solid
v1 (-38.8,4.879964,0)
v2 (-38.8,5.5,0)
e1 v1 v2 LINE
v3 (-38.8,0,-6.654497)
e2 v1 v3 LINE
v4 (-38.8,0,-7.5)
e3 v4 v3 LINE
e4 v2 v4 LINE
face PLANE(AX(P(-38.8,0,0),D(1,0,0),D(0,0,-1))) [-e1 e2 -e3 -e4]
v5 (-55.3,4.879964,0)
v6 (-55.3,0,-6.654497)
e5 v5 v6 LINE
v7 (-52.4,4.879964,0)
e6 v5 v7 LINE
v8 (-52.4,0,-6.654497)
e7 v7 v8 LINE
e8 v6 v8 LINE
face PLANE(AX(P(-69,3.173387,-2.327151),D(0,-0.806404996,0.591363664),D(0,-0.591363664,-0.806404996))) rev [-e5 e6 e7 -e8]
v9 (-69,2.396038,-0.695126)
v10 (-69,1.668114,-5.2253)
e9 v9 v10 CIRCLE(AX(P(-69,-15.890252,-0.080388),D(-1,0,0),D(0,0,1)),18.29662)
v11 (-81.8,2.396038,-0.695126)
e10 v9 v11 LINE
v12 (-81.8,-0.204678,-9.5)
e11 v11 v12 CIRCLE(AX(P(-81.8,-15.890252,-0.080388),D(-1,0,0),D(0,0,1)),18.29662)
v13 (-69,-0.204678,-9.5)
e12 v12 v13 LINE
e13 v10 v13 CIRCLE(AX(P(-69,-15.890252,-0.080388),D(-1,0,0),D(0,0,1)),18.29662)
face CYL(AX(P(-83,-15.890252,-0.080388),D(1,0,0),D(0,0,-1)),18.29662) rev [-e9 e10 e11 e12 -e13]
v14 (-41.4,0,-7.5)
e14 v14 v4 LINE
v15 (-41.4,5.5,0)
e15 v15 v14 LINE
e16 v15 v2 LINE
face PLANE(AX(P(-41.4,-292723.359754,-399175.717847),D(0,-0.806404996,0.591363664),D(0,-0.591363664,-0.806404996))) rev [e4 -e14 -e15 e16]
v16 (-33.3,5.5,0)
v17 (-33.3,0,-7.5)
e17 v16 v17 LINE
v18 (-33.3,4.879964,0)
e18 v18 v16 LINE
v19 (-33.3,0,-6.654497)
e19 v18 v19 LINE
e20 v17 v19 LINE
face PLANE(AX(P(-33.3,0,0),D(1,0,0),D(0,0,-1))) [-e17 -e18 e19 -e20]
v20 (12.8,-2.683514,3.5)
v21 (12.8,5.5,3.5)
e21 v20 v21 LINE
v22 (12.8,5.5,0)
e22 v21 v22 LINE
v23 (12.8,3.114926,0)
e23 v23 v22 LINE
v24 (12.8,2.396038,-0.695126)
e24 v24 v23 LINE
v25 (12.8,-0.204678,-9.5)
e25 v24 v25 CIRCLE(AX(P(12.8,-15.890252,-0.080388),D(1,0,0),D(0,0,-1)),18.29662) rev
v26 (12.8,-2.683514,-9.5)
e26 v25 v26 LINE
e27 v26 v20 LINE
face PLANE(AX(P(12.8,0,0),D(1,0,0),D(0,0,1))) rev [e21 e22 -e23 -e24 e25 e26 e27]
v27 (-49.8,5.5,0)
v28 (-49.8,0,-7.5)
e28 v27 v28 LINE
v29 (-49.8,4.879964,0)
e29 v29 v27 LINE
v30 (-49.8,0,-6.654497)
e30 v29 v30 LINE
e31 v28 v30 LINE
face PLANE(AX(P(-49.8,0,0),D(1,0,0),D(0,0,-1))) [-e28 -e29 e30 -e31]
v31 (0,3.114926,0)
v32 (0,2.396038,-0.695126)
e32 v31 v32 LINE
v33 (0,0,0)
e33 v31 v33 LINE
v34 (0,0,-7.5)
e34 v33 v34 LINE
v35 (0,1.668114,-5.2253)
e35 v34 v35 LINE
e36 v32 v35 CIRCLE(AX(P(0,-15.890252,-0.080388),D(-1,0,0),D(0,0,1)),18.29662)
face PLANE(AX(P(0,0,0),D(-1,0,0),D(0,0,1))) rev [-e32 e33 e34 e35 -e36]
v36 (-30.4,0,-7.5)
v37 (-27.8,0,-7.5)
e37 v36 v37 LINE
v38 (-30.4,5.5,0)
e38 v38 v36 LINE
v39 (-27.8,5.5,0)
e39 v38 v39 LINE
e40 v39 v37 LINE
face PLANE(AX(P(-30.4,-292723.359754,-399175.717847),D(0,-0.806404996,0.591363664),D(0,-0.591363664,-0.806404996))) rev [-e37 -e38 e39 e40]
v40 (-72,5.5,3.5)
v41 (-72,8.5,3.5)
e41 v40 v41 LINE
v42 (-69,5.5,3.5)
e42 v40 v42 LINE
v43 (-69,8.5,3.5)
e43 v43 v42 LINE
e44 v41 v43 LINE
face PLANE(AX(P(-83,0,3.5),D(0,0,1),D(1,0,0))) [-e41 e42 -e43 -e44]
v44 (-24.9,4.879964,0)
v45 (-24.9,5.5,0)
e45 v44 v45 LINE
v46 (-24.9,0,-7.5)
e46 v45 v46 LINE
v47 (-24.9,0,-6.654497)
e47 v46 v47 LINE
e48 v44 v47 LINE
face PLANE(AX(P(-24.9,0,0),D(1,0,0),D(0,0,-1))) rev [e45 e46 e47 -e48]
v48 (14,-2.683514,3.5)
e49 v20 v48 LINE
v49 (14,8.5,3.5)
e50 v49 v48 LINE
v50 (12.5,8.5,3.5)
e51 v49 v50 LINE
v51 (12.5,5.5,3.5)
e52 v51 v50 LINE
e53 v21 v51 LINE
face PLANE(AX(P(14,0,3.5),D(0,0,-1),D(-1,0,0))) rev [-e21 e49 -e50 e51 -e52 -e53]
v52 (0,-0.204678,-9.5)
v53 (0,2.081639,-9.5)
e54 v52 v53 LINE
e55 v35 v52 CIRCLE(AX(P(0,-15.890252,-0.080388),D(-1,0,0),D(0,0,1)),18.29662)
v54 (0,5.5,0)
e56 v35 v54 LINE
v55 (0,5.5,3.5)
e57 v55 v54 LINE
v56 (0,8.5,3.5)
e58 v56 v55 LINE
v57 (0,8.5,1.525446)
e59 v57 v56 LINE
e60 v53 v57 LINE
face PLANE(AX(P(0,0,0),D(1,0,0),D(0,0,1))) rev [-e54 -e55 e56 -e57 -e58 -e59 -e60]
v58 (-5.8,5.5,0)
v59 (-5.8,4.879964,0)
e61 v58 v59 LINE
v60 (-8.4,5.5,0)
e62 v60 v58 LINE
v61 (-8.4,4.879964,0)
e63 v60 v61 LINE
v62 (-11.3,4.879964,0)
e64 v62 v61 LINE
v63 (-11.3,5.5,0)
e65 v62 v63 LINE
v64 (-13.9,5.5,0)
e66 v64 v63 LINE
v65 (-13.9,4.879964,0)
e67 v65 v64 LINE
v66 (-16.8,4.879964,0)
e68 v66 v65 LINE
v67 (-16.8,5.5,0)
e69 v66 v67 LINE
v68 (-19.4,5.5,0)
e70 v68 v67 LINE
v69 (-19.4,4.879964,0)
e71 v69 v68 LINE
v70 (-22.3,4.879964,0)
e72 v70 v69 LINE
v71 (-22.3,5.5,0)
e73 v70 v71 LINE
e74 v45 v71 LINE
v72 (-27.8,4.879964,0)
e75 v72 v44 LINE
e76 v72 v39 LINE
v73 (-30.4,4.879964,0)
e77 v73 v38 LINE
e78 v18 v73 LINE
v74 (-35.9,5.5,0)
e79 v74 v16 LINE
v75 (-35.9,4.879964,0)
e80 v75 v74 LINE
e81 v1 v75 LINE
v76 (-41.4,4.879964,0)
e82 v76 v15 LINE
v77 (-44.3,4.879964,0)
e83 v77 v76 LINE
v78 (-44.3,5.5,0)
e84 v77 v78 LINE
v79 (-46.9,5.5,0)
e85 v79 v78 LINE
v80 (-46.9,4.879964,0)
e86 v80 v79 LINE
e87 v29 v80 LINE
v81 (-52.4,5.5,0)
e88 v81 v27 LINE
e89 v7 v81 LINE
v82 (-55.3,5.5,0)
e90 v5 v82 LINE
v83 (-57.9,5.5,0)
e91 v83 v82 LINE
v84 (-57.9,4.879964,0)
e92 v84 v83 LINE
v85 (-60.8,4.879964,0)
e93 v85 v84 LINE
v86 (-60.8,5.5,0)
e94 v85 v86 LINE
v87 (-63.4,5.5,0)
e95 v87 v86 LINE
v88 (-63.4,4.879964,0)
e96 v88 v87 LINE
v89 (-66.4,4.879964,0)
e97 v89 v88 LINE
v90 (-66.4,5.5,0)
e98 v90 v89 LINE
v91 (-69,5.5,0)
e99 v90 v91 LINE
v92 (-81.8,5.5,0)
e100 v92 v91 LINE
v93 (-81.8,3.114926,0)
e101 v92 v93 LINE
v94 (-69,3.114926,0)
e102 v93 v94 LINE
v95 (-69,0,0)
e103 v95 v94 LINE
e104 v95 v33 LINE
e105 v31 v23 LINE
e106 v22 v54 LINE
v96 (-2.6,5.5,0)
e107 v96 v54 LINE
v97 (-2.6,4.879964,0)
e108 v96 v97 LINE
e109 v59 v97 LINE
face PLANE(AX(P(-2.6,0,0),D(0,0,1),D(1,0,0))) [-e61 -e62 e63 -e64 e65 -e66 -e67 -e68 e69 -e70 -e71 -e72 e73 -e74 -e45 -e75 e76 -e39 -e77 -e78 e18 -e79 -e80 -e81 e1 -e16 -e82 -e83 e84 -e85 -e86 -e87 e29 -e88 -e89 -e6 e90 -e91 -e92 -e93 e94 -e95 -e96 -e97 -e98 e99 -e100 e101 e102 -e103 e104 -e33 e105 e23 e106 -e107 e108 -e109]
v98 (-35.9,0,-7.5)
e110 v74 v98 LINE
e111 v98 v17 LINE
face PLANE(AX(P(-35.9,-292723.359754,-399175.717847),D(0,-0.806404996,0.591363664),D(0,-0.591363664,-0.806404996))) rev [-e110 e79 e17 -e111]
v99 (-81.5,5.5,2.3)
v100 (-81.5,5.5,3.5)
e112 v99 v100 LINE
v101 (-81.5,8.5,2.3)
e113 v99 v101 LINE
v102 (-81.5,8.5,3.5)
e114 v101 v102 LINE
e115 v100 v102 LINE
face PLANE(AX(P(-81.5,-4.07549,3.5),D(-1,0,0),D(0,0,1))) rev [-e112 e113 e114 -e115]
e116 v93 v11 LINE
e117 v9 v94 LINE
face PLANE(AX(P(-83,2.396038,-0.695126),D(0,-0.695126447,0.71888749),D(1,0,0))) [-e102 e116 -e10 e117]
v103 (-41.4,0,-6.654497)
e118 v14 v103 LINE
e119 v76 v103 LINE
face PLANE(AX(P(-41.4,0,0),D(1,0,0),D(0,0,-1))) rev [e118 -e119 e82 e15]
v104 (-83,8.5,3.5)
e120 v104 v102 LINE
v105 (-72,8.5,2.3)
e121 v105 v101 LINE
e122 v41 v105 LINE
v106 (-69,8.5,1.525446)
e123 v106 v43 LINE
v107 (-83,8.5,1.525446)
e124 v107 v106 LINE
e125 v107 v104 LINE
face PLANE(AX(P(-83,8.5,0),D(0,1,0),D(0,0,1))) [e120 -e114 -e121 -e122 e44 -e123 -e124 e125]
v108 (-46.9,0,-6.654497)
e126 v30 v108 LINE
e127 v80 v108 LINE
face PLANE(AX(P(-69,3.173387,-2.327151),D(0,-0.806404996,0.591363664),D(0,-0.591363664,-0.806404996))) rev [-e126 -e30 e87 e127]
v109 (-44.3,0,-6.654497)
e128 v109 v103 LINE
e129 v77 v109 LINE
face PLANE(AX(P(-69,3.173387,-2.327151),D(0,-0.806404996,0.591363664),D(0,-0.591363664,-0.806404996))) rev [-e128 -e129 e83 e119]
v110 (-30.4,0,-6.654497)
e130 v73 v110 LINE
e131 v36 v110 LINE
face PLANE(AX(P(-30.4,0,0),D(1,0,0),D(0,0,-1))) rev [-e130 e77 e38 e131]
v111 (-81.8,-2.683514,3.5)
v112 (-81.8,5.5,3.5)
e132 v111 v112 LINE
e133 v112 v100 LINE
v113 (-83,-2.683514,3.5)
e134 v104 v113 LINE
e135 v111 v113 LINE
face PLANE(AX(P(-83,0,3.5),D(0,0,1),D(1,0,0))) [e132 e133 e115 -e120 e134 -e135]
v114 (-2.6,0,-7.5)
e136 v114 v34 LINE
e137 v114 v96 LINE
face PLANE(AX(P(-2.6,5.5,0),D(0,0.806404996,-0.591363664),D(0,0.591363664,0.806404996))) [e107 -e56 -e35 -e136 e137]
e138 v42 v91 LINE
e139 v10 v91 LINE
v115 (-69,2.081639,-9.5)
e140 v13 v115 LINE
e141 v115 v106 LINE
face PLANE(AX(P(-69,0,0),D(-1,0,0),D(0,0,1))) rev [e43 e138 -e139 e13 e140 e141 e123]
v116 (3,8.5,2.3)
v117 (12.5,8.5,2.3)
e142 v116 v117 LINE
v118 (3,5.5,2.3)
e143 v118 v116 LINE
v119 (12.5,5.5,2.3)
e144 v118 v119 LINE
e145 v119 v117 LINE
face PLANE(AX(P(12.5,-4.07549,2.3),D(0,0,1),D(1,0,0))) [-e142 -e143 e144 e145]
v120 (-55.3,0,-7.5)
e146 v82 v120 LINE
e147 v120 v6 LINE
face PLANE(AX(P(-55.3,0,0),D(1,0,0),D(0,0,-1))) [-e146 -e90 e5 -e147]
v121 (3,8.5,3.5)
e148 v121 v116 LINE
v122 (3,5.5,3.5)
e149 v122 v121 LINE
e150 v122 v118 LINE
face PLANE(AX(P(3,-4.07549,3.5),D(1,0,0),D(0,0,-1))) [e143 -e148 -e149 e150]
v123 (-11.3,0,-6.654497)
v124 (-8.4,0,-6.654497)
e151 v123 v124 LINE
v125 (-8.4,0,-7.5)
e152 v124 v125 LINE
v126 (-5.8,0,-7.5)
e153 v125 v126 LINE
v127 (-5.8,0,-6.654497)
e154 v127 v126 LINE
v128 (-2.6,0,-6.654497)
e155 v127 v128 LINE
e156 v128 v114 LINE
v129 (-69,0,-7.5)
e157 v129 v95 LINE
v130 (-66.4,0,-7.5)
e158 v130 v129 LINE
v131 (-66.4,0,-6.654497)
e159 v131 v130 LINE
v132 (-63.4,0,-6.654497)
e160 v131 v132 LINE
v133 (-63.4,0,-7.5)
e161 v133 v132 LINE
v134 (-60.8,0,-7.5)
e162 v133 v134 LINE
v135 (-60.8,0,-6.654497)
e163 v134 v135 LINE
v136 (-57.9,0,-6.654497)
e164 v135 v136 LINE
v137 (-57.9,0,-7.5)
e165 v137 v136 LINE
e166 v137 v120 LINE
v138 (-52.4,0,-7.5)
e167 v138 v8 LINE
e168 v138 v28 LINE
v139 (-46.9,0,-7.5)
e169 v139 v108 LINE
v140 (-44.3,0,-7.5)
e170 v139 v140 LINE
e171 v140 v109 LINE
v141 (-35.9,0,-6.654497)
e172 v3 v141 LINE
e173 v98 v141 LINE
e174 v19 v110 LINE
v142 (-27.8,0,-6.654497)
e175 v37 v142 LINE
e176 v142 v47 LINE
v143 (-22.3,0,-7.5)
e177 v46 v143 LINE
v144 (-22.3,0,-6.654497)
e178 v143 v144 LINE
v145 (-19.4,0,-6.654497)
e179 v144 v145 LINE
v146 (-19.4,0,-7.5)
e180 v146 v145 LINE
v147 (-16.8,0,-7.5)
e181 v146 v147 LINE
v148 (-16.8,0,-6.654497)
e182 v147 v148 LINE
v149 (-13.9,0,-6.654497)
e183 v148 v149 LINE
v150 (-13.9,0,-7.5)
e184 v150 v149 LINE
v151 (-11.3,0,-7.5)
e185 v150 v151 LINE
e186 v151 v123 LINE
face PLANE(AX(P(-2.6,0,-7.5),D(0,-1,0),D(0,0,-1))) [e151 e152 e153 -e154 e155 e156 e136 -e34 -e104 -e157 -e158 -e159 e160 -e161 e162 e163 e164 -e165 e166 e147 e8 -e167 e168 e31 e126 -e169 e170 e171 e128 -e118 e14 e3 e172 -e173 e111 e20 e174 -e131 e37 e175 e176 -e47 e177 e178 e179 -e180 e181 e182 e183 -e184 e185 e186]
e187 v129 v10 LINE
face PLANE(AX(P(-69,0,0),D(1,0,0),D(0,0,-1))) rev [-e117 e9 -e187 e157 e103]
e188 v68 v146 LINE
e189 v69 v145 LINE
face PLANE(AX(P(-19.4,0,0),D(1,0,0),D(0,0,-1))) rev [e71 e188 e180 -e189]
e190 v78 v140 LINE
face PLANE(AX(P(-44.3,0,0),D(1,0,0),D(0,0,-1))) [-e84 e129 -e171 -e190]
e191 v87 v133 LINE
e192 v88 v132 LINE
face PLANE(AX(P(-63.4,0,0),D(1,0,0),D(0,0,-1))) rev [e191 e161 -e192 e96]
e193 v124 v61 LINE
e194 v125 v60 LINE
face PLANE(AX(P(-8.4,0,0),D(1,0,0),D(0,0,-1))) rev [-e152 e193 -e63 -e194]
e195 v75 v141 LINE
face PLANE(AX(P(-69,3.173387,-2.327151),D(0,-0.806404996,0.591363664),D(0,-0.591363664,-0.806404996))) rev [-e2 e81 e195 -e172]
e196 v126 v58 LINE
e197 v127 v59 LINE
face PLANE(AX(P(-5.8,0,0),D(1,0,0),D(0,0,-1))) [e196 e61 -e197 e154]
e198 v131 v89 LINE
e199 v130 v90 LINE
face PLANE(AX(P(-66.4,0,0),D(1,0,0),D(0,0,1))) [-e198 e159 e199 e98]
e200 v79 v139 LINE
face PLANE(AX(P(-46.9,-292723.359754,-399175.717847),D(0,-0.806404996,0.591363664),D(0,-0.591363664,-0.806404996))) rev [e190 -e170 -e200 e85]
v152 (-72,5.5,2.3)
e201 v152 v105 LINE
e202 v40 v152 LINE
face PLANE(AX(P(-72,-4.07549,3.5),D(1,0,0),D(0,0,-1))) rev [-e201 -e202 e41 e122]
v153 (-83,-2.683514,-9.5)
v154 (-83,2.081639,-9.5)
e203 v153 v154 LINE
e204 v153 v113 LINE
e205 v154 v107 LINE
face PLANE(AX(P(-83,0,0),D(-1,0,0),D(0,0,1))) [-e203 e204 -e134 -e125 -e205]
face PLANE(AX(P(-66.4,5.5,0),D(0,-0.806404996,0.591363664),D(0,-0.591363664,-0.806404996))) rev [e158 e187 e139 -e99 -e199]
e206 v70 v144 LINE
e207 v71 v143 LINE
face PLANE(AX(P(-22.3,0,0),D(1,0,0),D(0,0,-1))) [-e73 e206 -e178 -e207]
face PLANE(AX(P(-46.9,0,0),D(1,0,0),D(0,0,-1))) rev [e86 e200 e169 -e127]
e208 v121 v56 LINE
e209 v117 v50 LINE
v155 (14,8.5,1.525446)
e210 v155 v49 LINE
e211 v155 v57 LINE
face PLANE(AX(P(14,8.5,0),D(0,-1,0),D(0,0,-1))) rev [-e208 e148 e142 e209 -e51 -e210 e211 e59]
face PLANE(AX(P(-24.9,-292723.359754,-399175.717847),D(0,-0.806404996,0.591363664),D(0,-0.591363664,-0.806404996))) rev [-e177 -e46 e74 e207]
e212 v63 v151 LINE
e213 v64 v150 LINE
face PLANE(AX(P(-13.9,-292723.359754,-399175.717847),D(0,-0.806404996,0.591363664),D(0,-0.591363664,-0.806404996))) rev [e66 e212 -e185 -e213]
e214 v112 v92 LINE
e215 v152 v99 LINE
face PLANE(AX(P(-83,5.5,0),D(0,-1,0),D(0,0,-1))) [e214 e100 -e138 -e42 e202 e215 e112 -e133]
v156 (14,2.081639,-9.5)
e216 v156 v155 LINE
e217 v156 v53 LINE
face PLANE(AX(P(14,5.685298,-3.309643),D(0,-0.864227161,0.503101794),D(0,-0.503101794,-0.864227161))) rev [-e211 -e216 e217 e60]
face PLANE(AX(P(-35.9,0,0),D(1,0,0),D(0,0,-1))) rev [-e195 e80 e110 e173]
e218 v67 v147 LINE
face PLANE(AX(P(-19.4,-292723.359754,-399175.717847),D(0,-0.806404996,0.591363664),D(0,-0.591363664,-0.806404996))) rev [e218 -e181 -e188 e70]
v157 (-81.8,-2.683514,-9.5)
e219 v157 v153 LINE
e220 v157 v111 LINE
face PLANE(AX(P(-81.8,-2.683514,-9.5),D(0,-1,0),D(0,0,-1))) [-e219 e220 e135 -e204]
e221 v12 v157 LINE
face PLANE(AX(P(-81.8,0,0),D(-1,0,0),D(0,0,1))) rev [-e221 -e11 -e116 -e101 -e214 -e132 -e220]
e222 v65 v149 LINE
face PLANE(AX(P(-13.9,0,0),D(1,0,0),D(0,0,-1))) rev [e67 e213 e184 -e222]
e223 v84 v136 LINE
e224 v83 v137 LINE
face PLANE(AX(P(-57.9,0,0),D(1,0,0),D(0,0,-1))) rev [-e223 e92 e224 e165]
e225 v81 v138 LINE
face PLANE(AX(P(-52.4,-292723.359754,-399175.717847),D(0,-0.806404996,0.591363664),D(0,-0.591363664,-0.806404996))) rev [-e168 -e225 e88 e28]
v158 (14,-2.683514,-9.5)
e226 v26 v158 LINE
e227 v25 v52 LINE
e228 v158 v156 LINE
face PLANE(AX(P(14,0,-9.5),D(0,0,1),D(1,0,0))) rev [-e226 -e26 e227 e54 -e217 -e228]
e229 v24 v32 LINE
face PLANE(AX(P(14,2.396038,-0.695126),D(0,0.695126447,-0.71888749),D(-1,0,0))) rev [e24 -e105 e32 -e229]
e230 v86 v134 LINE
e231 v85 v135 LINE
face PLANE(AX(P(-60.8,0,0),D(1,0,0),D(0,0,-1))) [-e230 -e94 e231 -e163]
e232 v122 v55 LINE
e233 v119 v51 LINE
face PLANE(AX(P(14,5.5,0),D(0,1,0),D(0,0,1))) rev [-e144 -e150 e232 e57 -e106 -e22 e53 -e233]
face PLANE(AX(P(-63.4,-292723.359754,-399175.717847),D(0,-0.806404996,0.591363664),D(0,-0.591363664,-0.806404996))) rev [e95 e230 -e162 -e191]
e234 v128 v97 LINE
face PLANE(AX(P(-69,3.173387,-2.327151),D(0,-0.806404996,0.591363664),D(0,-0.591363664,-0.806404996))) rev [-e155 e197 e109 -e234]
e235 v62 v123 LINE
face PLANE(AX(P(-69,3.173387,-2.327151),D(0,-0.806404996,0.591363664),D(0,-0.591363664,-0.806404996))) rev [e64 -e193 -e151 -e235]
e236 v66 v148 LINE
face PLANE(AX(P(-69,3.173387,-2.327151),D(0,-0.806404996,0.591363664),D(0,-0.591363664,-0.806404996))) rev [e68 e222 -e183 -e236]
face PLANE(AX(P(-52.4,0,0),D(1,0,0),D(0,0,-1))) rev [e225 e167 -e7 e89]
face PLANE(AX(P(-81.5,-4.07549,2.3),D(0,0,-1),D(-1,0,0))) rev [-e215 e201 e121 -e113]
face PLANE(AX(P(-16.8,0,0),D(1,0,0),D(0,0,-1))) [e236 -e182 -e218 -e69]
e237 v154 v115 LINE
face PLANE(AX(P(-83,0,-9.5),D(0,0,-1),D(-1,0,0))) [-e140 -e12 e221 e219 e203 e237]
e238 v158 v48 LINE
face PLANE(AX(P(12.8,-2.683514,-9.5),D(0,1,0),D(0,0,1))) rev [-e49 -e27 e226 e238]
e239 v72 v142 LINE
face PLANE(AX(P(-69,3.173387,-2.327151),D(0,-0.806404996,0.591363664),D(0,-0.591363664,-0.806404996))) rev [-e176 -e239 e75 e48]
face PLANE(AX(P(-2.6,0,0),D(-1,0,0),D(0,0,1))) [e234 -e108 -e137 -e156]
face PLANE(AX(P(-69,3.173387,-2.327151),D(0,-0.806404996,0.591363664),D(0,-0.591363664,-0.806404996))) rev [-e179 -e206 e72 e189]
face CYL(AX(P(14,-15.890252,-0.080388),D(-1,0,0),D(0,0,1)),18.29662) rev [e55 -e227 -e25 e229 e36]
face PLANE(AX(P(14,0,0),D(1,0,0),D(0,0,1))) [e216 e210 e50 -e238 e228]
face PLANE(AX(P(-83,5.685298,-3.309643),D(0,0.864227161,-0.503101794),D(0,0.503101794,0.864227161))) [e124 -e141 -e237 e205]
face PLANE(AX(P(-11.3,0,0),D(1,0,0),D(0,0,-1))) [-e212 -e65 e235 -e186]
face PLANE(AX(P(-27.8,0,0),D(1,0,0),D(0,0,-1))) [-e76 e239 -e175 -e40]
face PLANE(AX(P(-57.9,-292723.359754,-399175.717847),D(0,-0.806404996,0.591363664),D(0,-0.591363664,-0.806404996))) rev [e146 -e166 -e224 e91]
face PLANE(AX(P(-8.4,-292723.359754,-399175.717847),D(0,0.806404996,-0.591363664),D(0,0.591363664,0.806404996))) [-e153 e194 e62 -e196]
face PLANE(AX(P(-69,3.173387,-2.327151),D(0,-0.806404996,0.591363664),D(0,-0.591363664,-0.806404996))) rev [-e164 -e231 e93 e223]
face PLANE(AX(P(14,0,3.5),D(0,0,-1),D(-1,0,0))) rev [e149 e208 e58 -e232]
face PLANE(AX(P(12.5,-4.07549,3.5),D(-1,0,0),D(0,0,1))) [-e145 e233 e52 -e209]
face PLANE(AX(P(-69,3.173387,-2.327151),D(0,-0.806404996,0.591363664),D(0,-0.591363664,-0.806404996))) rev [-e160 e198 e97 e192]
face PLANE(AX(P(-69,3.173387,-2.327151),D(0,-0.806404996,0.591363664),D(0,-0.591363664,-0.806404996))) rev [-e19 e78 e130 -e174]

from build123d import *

# Parameters (mm, degrees)
BOSS_EXTRUDE1_DEPTH    = 2.6
BOSS_EXTRUDE2_START    = -2.6
BOSS_EXTRUDE2_DEPTH    = 69
BOSS_EXTRUDE3_START    = 3.2
BOSS_EXTRUDE3_DEPTH    = 2.6
FILL_START             = -63.4
FILL_PATTERN1_DEPTH    = 2.6
FILL_START_2           = -57.9
FILL_PATTERN1_2_DEPTH  = 2.6
FILL_START_3           = -52.4
FILL_PATTERN1_3_DEPTH  = 2.6
FILL_START_4           = -46.9
FILL_PATTERN1_4_DEPTH  = 2.6
FILL_START_5           = -41.4
FILL_PATTERN1_5_DEPTH  = 2.6
FILL_START_6           = -35.9
FILL_PATTERN1_6_DEPTH  = 2.6
FILL_START_7           = -30.4
FILL_PATTERN1_7_DEPTH  = 2.6
FILL_START_8           = -24.9
FILL_PATTERN1_8_DEPTH  = 2.6
FILL_START_9           = -19.4
FILL_PATTERN1_9_DEPTH  = 2.6
FILL_START_10          = -13.9
FILL_PATTERN1_10_DEPTH = 2.6
BOSS_EXTRUDE4_DEPTH    = 14
BOSS_EXTRUDE5_DEPTH    = 1.2
SKETCH6_W              = 9.5
SKETCH6_H              = 1.2
CUT_EXTRUDE1_DEPTH     = 3
CHAMFER1_START         = -1
CHAMFER1_DEPTH         = 3.165267299


with BuildPart() as part:
    # Sketch2 → Boss-Extrude1 (new body)
    with BuildSketch(Plane(origin=(0, 0, 0), x_dir=(0, 0, -1), z_dir=(1, 0, 0))):
        Polygon((0, 0), (0, 5.5), (7.5, 0), align=None)
    boss_extrude1 = extrude(amount=-BOSS_EXTRUDE1_DEPTH)

    # Sketch3 → Boss-Extrude2 (add)
    with BuildSketch(Plane.ZY.offset(2.6).offset(BOSS_EXTRUDE2_START)):
        Polygon((0, 0), (0, 4.879964159), (-6.65449658, 0), align=None)
    extrude(amount=BOSS_EXTRUDE2_DEPTH)

    # Sketch3<3> → Boss-Extrude3 (add)
    with BuildSketch(Plane.ZY.offset(2.6).offset(BOSS_EXTRUDE3_START)):
        Polygon((-6.65449658, 0), (0, 4.879964159), (0, 5.5), (-7.5, 0), align=None)
    extrude(amount=BOSS_EXTRUDE3_DEPTH)

    # Mirror1: Boss-Extrude1 across plane
    add(boss_extrude1.mirror(Plane(origin=(-34.5, 0, 0), x_dir=(0, 0, 1), z_dir=(1, 0, 0))))

    # Fill Pattern1: read off the stored shape, not the designer's step
    # Fill Pattern1 outline → Fill Pattern1 (add)
    with BuildSketch(Plane.YZ.offset(FILL_START)):
        Polygon((4.879964159, 0), (0, -6.65449658), (0, -7.5), (5.5, 0), align=None)
    extrude(amount=FILL_PATTERN1_DEPTH)

    # Fill Pattern1 2 outline → Fill Pattern1 2 (add)
    with BuildSketch(Plane.YZ.offset(FILL_START_2)):
        Polygon((4.879964159, 0), (0, -6.65449658), (0, -7.5), (5.5, 0), align=None)
    extrude(amount=FILL_PATTERN1_2_DEPTH)

    # Fill Pattern1 3 outline → Fill Pattern1 3 (add)
    with BuildSketch(Plane.YZ.offset(FILL_START_3)):
        Polygon((4.879964159, 0), (0, -6.65449658), (0, -7.5), (5.5, 0), align=None)
    extrude(amount=FILL_PATTERN1_3_DEPTH)

    # Fill Pattern1 4 outline → Fill Pattern1 4 (add)
    with BuildSketch(Plane.YZ.offset(FILL_START_4)):
        Polygon((4.879964159, 0), (0, -6.65449658), (0, -7.5), (5.5, 0), align=None)
    extrude(amount=FILL_PATTERN1_4_DEPTH)

    # Fill Pattern1 5 outline → Fill Pattern1 5 (add)
    with BuildSketch(Plane.YZ.offset(FILL_START_5)):
        Polygon((4.879964159, 0), (0, -6.65449658), (0, -7.5), (5.5, 0), align=None)
    extrude(amount=FILL_PATTERN1_5_DEPTH)

    # Fill Pattern1 6 outline → Fill Pattern1 6 (add)
    with BuildSketch(Plane.YZ.offset(FILL_START_6)):
        Polygon((4.879964159, 0), (0, -6.65449658), (0, -7.5), (5.5, 0), align=None)
    extrude(amount=FILL_PATTERN1_6_DEPTH)

    # Fill Pattern1 7 outline → Fill Pattern1 7 (add)
    with BuildSketch(Plane.YZ.offset(FILL_START_7)):
        Polygon((4.879964159, 0), (0, -6.65449658), (0, -7.5), (5.5, 0), align=None)
    extrude(amount=FILL_PATTERN1_7_DEPTH)

    # Fill Pattern1 8 outline → Fill Pattern1 8 (add)
    with BuildSketch(Plane.YZ.offset(FILL_START_8)):
        Polygon((4.879964159, 0), (0, -6.65449658), (0, -7.5), (5.5, 0), align=None)
    extrude(amount=FILL_PATTERN1_8_DEPTH)

    # Fill Pattern1 9 outline → Fill Pattern1 9 (add)
    with BuildSketch(Plane.YZ.offset(FILL_START_9)):
        Polygon((4.879964159, 0), (0, -6.65449658), (0, -7.5), (5.5, 0), align=None)
    extrude(amount=FILL_PATTERN1_9_DEPTH)

    # Fill Pattern1 10 outline → Fill Pattern1 10 (add)
    with BuildSketch(Plane.YZ.offset(FILL_START_10)):
        Polygon((4.879964159, 0), (0, -6.65449658), (0, -7.5), (5.5, 0), align=None)
    extrude(amount=FILL_PATTERN1_10_DEPTH)

    # Sketch4 → Boss-Extrude4 (add)
    with BuildSketch(Plane.ZY.offset(69)):
        with BuildLine():
            Line((0, 2.406191741), (0, 4.879964159))
            Line((0, 4.879964159), (-3.932237623, 1.996323235))
            ThreePointArc((-3.932237623, 1.996323235), (-1.977221876, 2.307779179), (0, 2.406191741))
        make_face()
        with BuildLine():
            Line((0, 4.879964159), (0, 5.5))
            Line((0, 5.5), (-5.225299515, 1.668113689))
            ThreePointArc((-5.225299515, 1.668113689), (-4.581760916, 1.844007543), (-3.932237623, 1.996323235))
            Line((-3.932237623, 1.996323235), (0, 4.879964159))
        make_face()
        with BuildLine():
            Line((-5.225299515, 1.668113689), (0, 5.5))
            Line((0, 5.5), (3.5, 5.5))
            Line((3.5, 5.5), (3.5, 8.5))
            Line((3.5, 8.5), (1.525445934, 8.5))
            Line((1.525445934, 8.5), (-9.5, 2.081639323))
            Line((-9.5, 2.081639323), (-9.5, -0.204677967))
            ThreePointArc((-9.5, -0.204677967), (-7.422606569, 0.868570996), (-5.225299515, 1.668113689))
        make_face()
    boss_extrude4 = extrude(amount=BOSS_EXTRUDE4_DEPTH)

    # Sketch5 → Boss-Extrude5 (add)
    with BuildSketch(Plane.ZY.offset(83)):
        Polygon((3.5, 8.5), (1.525445934, 8.5), (-9.5, 2.081639323), (-9.5, -2.683513675), (3.5, -2.683513675), align=None)
    boss_extrude5 = extrude(amount=-BOSS_EXTRUDE5_DEPTH)

    # Sketch6 → Cut-Extrude1 (cut)
    with BuildSketch(Plane(origin=(0, 8.5, 0), x_dir=(1, 0, 0), z_dir=(0, 1, 0))):
        with Locations((-76.75, -2.9)):
            Rectangle(SKETCH6_W, SKETCH6_H)
    cut_extrude1 = extrude(amount=-CUT_EXTRUDE1_DEPTH, mode=Mode.SUBTRACT)

    # Chamfer1: read off the stored shape, not the designer's step
    # Chamfer1 outline → Chamfer1 (cut)
    with BuildSketch(Plane(origin=(0, 0, 0), x_dir=(1, 0, 0), z_dir=(0, 0.6951264470531402, -0.7188874895331522)).offset(CHAMFER1_START)):
        Polygon((-69, -1.239281183), (-81.8, -1.239281183), (-81.8, -2.239281185), (-69, -2.239281183), align=None)
    chamfer1 = extrude(amount=CHAMFER1_DEPTH, mode=Mode.SUBTRACT)

    # Mirror2: Boss-Extrude4, Boss-Extrude5, Cut-Extrude1, Chamfer1 across plane
    add(boss_extrude4.mirror(Plane(origin=(-34.5, 0, 0), x_dir=(0, 0, 1), z_dir=(1, 0, 0))))
    add(boss_extrude5.mirror(Plane(origin=(-34.5, 0, 0), x_dir=(0, 0, 1), z_dir=(1, 0, 0))))
    add(cut_extrude1.mirror(Plane(origin=(-34.5, 0, 0), x_dir=(0, 0, 1), z_dir=(1, 0, 0))), mode=Mode.SUBTRACT)
    add(chamfer1.mirror(Plane(origin=(-34.5, 0, 0), x_dir=(0, 0, 1), z_dir=(1, 0, 0))), mode=Mode.SUBTRACT)


solid = part.part
